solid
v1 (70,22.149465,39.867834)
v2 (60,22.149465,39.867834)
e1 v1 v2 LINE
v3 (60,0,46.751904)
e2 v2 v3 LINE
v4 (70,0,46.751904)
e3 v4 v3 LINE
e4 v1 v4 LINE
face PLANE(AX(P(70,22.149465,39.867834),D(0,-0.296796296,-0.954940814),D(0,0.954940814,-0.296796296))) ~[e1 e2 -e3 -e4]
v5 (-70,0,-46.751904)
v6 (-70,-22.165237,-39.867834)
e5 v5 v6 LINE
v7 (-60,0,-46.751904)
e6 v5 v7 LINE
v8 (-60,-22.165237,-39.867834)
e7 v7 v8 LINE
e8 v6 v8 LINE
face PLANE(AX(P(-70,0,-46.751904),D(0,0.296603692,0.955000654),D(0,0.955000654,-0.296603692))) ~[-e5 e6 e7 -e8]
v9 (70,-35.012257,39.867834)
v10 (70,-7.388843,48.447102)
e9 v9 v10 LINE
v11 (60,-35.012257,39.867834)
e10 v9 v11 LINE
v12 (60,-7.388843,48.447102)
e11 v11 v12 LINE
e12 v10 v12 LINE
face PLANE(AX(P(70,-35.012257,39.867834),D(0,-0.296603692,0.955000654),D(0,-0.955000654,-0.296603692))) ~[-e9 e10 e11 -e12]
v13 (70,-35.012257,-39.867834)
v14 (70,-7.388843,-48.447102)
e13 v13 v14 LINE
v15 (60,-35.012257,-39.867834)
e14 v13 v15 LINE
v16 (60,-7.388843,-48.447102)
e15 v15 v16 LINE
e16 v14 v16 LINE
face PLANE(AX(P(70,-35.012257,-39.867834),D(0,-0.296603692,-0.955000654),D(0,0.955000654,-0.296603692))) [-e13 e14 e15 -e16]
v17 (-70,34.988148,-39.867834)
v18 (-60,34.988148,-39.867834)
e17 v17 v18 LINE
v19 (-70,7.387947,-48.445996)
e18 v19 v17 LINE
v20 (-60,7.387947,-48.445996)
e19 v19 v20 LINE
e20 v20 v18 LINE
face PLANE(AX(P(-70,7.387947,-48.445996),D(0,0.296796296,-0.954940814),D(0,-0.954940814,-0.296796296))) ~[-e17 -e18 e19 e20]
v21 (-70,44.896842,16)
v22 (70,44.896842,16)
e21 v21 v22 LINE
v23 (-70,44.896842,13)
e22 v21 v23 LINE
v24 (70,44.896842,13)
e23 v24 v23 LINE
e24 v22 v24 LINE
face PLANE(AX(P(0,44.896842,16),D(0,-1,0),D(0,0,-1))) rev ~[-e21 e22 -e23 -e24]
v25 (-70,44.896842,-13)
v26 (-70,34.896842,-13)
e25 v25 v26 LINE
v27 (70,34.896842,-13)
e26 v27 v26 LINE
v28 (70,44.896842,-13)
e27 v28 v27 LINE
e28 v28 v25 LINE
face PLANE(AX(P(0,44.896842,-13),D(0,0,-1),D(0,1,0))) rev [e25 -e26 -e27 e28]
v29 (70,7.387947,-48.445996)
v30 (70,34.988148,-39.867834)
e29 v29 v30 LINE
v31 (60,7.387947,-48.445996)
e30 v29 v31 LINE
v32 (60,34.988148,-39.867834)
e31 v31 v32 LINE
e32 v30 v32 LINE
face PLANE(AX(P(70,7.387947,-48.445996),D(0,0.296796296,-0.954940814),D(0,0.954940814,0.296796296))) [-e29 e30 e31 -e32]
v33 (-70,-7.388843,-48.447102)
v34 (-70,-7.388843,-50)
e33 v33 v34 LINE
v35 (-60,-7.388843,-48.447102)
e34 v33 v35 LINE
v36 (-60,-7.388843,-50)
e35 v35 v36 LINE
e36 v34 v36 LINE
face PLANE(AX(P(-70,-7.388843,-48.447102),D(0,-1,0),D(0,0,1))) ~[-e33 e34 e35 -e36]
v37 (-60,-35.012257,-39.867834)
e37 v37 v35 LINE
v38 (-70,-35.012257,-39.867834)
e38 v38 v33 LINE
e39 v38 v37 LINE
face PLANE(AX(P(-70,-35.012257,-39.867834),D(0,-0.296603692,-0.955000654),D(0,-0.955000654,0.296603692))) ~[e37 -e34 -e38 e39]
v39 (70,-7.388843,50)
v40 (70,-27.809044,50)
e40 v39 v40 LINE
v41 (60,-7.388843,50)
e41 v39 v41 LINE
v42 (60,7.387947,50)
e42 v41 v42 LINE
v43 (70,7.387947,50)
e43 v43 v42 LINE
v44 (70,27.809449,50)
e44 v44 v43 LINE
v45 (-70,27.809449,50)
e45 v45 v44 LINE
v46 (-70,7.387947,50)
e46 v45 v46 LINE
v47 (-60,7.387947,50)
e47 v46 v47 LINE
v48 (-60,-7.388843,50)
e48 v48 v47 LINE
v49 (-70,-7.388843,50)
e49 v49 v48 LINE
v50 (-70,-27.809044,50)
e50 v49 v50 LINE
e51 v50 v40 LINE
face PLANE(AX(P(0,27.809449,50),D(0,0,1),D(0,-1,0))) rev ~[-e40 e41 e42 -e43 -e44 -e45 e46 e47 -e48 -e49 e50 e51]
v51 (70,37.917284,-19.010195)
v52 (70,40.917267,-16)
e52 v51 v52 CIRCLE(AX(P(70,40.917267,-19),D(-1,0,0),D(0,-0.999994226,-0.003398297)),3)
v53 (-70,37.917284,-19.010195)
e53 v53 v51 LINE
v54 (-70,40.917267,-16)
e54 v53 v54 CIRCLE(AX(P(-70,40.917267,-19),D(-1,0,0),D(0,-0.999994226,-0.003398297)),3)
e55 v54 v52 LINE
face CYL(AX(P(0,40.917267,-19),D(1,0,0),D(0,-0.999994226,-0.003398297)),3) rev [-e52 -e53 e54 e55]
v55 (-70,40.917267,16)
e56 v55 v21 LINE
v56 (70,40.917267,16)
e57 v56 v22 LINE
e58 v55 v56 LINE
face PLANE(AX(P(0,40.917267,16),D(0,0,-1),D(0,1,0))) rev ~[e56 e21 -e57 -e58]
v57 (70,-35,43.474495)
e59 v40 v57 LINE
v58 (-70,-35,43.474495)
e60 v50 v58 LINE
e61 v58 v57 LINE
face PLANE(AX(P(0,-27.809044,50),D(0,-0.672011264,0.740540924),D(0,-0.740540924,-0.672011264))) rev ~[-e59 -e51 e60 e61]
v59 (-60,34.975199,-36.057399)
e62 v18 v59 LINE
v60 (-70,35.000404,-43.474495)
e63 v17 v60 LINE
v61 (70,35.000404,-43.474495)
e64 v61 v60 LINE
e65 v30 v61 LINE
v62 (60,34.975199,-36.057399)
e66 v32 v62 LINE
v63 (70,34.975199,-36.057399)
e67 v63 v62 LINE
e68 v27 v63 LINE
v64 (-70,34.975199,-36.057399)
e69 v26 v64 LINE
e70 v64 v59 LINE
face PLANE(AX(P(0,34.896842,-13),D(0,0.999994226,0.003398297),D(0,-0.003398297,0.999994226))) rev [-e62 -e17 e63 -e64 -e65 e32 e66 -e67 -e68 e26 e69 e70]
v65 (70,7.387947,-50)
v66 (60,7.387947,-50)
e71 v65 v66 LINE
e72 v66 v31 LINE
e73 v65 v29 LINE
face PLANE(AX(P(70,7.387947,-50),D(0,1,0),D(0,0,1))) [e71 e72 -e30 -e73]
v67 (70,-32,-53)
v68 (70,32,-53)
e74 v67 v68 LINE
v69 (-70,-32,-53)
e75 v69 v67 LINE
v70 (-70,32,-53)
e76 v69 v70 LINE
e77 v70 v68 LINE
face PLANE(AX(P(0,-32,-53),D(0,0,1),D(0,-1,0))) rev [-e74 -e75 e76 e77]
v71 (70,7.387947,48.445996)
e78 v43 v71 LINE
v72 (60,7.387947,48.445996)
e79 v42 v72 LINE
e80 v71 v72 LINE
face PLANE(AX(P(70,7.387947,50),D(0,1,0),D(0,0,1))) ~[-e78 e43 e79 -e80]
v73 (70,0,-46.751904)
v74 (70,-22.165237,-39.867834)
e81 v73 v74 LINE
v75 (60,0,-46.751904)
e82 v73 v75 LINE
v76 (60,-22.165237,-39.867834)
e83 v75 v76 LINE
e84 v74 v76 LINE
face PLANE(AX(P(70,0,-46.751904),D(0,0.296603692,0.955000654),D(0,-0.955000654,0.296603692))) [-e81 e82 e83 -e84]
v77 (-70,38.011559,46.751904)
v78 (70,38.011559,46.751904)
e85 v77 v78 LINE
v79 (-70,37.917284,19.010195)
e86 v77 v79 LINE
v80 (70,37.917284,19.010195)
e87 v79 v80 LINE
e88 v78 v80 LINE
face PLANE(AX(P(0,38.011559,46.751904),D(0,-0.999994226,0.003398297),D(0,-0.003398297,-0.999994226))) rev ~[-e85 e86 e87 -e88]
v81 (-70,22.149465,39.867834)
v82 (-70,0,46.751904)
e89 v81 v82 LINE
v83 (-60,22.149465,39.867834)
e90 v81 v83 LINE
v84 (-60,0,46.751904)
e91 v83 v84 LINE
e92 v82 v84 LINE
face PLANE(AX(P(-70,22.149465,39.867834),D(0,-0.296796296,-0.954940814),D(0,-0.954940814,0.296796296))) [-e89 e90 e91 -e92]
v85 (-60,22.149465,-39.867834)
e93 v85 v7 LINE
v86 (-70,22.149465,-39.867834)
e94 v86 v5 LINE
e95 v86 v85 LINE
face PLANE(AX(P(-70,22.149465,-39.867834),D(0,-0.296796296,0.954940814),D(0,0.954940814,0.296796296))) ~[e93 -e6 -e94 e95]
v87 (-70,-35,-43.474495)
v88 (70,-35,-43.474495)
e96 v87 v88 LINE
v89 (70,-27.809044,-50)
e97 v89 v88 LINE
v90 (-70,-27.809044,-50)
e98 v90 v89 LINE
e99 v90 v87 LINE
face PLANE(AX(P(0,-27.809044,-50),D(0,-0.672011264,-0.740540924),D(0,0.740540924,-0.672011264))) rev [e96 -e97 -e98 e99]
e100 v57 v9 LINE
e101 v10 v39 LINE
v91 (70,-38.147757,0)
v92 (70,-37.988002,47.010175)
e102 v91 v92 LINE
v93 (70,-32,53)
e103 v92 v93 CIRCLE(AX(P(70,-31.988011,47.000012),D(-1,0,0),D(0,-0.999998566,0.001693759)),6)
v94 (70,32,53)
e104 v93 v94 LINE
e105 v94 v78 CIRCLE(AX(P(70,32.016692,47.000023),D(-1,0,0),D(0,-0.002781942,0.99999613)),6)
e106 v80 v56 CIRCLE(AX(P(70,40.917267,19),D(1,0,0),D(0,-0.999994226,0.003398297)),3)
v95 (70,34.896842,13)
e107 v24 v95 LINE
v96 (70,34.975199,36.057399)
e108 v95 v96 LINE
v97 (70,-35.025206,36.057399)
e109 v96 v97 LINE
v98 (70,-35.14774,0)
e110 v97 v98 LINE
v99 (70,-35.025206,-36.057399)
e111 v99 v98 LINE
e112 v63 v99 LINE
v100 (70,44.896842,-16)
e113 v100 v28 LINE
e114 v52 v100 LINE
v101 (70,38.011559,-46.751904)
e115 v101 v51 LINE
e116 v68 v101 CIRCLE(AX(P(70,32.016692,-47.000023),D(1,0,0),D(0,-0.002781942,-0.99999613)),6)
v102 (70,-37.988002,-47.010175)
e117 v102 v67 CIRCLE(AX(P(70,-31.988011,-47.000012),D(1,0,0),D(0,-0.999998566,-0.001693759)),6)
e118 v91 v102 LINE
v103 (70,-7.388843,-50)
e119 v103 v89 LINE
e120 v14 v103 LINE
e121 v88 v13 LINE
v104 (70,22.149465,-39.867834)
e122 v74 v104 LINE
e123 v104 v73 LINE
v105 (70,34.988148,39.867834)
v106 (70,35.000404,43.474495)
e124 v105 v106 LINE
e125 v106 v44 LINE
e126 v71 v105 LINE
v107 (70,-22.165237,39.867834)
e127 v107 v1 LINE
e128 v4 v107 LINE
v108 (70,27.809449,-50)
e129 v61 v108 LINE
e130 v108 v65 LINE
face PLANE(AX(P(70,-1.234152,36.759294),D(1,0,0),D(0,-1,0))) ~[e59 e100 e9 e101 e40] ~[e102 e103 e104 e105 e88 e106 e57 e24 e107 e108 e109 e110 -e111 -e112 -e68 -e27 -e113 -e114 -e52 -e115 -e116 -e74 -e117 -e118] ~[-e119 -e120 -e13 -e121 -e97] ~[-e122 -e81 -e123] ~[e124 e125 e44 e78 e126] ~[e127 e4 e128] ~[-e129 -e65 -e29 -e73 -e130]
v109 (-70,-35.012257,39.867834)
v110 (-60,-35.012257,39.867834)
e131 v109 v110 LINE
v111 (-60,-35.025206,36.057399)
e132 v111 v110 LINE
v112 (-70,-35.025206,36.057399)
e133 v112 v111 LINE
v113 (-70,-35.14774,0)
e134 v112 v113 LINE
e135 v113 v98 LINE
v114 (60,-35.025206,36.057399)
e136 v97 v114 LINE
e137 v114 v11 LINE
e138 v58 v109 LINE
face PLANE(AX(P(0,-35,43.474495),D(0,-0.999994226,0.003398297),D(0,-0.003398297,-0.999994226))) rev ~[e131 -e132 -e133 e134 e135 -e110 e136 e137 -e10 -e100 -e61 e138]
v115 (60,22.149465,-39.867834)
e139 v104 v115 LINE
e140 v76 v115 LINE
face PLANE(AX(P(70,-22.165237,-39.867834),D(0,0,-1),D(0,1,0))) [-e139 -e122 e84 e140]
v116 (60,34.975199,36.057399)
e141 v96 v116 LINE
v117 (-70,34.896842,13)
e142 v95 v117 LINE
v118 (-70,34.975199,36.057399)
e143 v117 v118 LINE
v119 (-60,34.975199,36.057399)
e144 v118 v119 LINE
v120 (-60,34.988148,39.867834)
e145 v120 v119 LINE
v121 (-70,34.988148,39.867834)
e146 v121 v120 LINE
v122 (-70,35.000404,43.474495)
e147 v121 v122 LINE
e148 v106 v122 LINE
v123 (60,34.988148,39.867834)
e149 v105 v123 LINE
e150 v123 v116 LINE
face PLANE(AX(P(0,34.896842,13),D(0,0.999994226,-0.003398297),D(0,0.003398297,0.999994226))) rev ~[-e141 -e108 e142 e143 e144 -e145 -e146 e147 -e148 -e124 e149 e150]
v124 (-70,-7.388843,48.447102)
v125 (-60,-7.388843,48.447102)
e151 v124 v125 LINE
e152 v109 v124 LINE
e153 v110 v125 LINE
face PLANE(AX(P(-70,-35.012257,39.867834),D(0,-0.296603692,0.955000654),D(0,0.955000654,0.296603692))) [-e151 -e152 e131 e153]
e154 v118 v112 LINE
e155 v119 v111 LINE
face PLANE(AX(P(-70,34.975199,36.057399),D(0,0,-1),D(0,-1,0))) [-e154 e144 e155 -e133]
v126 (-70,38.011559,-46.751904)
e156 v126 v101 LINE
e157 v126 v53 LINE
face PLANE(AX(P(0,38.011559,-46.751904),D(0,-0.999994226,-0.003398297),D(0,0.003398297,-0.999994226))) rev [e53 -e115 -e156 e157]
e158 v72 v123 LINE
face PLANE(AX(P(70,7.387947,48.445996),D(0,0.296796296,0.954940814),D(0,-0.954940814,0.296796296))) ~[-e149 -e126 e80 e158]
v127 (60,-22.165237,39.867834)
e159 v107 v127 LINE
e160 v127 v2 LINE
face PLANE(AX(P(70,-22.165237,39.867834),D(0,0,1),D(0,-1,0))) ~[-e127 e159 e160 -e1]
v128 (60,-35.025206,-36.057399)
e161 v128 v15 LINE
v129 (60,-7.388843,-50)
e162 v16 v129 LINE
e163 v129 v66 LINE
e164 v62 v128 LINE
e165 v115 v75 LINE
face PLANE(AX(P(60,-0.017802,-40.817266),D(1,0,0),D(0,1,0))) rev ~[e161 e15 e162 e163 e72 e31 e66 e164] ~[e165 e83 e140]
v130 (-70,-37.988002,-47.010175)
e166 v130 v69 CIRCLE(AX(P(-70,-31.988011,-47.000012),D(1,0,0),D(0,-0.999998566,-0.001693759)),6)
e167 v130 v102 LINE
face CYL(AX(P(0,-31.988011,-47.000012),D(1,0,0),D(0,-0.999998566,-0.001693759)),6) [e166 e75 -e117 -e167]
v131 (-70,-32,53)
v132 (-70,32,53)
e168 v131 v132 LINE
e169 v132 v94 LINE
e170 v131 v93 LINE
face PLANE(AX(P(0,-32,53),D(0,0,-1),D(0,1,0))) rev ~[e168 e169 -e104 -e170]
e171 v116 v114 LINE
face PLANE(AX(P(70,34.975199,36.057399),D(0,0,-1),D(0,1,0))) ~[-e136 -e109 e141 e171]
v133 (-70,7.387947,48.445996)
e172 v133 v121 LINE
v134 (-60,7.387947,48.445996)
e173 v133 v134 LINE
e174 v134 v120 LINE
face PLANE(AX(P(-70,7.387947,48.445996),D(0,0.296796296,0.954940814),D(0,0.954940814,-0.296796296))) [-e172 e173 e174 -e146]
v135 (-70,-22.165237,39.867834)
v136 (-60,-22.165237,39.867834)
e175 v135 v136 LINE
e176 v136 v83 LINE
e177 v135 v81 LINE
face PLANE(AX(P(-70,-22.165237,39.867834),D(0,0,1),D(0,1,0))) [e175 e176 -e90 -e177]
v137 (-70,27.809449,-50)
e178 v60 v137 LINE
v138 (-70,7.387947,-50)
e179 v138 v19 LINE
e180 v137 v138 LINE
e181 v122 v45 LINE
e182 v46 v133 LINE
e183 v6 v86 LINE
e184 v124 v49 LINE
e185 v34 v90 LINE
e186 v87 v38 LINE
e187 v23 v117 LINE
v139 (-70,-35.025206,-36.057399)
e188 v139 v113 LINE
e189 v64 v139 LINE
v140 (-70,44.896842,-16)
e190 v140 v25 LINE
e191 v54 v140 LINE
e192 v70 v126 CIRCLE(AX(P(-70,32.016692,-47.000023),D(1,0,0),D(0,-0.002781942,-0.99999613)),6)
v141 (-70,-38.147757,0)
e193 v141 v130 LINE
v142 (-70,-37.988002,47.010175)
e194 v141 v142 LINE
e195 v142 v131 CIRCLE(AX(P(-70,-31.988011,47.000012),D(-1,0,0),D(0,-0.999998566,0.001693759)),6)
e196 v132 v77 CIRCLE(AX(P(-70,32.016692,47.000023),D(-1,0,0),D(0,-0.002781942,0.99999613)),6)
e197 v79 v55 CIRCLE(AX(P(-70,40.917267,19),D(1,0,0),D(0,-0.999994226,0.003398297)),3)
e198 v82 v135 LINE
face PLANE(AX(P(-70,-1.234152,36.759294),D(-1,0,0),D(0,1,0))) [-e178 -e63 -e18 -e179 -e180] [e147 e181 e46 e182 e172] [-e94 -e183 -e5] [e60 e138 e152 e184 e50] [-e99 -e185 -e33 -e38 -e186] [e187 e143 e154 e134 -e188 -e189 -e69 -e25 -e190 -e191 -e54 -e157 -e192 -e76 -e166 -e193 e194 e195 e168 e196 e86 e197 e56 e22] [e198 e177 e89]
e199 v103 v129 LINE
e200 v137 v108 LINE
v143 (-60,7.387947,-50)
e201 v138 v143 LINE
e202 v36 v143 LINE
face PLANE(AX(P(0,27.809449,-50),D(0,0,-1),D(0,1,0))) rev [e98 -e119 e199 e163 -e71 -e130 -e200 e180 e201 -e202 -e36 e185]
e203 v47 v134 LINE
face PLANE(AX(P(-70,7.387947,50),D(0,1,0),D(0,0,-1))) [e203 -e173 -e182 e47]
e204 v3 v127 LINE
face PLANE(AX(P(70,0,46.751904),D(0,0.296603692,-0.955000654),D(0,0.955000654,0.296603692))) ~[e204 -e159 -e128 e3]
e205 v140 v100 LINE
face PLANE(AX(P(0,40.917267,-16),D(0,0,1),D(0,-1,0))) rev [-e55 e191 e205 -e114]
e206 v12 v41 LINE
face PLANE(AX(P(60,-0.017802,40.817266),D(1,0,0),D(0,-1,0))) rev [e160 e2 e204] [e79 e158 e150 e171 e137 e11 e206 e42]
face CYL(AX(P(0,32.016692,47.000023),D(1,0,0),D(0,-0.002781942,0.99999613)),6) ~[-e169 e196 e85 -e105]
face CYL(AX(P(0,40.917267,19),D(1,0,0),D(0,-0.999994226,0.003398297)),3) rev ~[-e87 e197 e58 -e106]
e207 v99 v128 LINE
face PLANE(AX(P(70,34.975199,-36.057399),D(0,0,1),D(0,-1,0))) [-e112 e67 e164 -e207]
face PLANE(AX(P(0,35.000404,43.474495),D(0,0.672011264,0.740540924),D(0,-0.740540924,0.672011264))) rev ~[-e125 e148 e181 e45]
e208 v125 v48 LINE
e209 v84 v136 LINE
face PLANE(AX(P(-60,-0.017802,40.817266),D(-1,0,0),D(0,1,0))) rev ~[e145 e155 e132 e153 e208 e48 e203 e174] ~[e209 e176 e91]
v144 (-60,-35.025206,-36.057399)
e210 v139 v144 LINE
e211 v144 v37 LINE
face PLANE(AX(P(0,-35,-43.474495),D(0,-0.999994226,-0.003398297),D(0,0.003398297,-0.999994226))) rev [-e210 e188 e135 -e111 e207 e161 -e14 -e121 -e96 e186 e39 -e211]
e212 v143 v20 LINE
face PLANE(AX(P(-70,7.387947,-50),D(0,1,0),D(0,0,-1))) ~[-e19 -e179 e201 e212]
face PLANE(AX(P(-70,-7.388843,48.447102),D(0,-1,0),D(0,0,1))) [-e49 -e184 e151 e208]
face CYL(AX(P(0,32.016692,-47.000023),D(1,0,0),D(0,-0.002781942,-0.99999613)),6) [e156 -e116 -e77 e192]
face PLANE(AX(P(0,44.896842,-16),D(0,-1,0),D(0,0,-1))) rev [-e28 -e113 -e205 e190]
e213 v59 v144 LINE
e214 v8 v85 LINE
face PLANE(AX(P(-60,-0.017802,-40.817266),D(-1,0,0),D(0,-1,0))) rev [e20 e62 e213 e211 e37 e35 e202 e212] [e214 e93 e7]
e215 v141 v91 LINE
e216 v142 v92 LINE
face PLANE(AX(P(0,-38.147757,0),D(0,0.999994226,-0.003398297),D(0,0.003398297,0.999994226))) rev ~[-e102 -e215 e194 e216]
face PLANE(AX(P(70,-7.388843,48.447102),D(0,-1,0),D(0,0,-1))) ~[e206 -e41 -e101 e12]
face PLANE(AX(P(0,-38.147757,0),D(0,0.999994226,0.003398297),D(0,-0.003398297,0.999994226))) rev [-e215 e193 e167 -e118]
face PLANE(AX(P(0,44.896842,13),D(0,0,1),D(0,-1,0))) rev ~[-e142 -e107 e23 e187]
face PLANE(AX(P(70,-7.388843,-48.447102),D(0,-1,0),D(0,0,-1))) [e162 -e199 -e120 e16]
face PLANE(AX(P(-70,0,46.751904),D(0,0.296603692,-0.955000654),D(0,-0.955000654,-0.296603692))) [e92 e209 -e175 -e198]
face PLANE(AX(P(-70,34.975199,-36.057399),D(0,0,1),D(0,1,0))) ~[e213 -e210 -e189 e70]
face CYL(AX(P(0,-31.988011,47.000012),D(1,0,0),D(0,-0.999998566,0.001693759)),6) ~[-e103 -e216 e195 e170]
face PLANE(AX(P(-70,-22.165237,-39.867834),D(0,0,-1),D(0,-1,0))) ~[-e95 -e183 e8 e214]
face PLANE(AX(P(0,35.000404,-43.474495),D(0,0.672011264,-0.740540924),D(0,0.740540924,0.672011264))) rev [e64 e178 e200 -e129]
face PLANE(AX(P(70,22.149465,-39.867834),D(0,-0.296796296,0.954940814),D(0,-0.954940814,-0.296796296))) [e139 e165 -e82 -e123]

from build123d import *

# Parameters (mm, degrees)
F1_DEPTH = 70
F3_DEPTH = 10


# Not quite as in the source:
# - a feature names something its author has since deleted; it is built from what else it names


with BuildPart() as f1:
    # F0 (on Right) → F1 (new body)
    with BuildSketch(Plane.YZ):
        with BuildLine():
            Line((35.0004041982, -43.4744954109), (27.8094485444, -50))
            Line((27.8094485444, -50), (-27.8090443462, -50))
            Line((-27.8090443462, -50), (-35, -43.4744954109))
            Line((-35, -43.4744954109), (-35.1477400841, 0))
            Line((-35.1477400841, 0), (-38.1477574069, 0))
            Line((-38.1477574069, 0), (-37.988001967, -47.0101745328))
            ThreePointArc((-37.988001967, -47.0101745328), (-36.2312971095, -51.2420067187), (-32, -53))
            Line((-32, -53), (32, -53))
            ThreePointArc((32, -53), (36.3403848268, -51.1600325097), (38.0115591918, -46.7519039894))
            Line((38.0115591918, -46.7519039894), (37.917284091, -19.0101948899))
            ThreePointArc((37.917284091, -19.0101948899), (38.792345044, -16.8822871618), (40.9172667684, -16))
            Line((40.9172667684, -16), (44.8968422253, -16))
            Line((44.8968422253, -16), (44.8968422253, -13))
            Line((44.8968422253, -13), (34.8968422253, -13))
            Line((34.8968422253, -13), (35.0004041982, -43.4744954109))
        make_face()
    extrude(amount=F1_DEPTH)

    # F2 (on face) → F3 (join)
    with BuildSketch(Plane.YZ.offset(70)):
        Polygon((34.9751985597, -36.0573992247), (-35.0252056385, -36.0573992247), (-35.0122565756, -39.8678341294), (-7.3888426073, -48.4471021518), (-7.3888426073, -50), (-2.3888426073, -50), (2.3879472654, -50), (7.3879472654, -50), (7.3879472654, -48.4459963804), (34.9881476226, -39.8678341294), align=None)
        Polygon((0, -46.7519039894), (-22.1652372944, -39.8678341294), (22.1494653338, -39.8678341294), align=None, mode=Mode.SUBTRACT)
    extrude(amount=-F3_DEPTH)

    # F4: F1 across plane


with BuildPart() as f1_1:
    add(f1.part)
    add(f1.part.mirror(Plane.YZ))

    # F5: F1 across plane


with BuildPart() as f1_2:
    add(f1_1.part)
    add(f1_1.part.mirror(Plane.XY))


solid = f1_2.part
